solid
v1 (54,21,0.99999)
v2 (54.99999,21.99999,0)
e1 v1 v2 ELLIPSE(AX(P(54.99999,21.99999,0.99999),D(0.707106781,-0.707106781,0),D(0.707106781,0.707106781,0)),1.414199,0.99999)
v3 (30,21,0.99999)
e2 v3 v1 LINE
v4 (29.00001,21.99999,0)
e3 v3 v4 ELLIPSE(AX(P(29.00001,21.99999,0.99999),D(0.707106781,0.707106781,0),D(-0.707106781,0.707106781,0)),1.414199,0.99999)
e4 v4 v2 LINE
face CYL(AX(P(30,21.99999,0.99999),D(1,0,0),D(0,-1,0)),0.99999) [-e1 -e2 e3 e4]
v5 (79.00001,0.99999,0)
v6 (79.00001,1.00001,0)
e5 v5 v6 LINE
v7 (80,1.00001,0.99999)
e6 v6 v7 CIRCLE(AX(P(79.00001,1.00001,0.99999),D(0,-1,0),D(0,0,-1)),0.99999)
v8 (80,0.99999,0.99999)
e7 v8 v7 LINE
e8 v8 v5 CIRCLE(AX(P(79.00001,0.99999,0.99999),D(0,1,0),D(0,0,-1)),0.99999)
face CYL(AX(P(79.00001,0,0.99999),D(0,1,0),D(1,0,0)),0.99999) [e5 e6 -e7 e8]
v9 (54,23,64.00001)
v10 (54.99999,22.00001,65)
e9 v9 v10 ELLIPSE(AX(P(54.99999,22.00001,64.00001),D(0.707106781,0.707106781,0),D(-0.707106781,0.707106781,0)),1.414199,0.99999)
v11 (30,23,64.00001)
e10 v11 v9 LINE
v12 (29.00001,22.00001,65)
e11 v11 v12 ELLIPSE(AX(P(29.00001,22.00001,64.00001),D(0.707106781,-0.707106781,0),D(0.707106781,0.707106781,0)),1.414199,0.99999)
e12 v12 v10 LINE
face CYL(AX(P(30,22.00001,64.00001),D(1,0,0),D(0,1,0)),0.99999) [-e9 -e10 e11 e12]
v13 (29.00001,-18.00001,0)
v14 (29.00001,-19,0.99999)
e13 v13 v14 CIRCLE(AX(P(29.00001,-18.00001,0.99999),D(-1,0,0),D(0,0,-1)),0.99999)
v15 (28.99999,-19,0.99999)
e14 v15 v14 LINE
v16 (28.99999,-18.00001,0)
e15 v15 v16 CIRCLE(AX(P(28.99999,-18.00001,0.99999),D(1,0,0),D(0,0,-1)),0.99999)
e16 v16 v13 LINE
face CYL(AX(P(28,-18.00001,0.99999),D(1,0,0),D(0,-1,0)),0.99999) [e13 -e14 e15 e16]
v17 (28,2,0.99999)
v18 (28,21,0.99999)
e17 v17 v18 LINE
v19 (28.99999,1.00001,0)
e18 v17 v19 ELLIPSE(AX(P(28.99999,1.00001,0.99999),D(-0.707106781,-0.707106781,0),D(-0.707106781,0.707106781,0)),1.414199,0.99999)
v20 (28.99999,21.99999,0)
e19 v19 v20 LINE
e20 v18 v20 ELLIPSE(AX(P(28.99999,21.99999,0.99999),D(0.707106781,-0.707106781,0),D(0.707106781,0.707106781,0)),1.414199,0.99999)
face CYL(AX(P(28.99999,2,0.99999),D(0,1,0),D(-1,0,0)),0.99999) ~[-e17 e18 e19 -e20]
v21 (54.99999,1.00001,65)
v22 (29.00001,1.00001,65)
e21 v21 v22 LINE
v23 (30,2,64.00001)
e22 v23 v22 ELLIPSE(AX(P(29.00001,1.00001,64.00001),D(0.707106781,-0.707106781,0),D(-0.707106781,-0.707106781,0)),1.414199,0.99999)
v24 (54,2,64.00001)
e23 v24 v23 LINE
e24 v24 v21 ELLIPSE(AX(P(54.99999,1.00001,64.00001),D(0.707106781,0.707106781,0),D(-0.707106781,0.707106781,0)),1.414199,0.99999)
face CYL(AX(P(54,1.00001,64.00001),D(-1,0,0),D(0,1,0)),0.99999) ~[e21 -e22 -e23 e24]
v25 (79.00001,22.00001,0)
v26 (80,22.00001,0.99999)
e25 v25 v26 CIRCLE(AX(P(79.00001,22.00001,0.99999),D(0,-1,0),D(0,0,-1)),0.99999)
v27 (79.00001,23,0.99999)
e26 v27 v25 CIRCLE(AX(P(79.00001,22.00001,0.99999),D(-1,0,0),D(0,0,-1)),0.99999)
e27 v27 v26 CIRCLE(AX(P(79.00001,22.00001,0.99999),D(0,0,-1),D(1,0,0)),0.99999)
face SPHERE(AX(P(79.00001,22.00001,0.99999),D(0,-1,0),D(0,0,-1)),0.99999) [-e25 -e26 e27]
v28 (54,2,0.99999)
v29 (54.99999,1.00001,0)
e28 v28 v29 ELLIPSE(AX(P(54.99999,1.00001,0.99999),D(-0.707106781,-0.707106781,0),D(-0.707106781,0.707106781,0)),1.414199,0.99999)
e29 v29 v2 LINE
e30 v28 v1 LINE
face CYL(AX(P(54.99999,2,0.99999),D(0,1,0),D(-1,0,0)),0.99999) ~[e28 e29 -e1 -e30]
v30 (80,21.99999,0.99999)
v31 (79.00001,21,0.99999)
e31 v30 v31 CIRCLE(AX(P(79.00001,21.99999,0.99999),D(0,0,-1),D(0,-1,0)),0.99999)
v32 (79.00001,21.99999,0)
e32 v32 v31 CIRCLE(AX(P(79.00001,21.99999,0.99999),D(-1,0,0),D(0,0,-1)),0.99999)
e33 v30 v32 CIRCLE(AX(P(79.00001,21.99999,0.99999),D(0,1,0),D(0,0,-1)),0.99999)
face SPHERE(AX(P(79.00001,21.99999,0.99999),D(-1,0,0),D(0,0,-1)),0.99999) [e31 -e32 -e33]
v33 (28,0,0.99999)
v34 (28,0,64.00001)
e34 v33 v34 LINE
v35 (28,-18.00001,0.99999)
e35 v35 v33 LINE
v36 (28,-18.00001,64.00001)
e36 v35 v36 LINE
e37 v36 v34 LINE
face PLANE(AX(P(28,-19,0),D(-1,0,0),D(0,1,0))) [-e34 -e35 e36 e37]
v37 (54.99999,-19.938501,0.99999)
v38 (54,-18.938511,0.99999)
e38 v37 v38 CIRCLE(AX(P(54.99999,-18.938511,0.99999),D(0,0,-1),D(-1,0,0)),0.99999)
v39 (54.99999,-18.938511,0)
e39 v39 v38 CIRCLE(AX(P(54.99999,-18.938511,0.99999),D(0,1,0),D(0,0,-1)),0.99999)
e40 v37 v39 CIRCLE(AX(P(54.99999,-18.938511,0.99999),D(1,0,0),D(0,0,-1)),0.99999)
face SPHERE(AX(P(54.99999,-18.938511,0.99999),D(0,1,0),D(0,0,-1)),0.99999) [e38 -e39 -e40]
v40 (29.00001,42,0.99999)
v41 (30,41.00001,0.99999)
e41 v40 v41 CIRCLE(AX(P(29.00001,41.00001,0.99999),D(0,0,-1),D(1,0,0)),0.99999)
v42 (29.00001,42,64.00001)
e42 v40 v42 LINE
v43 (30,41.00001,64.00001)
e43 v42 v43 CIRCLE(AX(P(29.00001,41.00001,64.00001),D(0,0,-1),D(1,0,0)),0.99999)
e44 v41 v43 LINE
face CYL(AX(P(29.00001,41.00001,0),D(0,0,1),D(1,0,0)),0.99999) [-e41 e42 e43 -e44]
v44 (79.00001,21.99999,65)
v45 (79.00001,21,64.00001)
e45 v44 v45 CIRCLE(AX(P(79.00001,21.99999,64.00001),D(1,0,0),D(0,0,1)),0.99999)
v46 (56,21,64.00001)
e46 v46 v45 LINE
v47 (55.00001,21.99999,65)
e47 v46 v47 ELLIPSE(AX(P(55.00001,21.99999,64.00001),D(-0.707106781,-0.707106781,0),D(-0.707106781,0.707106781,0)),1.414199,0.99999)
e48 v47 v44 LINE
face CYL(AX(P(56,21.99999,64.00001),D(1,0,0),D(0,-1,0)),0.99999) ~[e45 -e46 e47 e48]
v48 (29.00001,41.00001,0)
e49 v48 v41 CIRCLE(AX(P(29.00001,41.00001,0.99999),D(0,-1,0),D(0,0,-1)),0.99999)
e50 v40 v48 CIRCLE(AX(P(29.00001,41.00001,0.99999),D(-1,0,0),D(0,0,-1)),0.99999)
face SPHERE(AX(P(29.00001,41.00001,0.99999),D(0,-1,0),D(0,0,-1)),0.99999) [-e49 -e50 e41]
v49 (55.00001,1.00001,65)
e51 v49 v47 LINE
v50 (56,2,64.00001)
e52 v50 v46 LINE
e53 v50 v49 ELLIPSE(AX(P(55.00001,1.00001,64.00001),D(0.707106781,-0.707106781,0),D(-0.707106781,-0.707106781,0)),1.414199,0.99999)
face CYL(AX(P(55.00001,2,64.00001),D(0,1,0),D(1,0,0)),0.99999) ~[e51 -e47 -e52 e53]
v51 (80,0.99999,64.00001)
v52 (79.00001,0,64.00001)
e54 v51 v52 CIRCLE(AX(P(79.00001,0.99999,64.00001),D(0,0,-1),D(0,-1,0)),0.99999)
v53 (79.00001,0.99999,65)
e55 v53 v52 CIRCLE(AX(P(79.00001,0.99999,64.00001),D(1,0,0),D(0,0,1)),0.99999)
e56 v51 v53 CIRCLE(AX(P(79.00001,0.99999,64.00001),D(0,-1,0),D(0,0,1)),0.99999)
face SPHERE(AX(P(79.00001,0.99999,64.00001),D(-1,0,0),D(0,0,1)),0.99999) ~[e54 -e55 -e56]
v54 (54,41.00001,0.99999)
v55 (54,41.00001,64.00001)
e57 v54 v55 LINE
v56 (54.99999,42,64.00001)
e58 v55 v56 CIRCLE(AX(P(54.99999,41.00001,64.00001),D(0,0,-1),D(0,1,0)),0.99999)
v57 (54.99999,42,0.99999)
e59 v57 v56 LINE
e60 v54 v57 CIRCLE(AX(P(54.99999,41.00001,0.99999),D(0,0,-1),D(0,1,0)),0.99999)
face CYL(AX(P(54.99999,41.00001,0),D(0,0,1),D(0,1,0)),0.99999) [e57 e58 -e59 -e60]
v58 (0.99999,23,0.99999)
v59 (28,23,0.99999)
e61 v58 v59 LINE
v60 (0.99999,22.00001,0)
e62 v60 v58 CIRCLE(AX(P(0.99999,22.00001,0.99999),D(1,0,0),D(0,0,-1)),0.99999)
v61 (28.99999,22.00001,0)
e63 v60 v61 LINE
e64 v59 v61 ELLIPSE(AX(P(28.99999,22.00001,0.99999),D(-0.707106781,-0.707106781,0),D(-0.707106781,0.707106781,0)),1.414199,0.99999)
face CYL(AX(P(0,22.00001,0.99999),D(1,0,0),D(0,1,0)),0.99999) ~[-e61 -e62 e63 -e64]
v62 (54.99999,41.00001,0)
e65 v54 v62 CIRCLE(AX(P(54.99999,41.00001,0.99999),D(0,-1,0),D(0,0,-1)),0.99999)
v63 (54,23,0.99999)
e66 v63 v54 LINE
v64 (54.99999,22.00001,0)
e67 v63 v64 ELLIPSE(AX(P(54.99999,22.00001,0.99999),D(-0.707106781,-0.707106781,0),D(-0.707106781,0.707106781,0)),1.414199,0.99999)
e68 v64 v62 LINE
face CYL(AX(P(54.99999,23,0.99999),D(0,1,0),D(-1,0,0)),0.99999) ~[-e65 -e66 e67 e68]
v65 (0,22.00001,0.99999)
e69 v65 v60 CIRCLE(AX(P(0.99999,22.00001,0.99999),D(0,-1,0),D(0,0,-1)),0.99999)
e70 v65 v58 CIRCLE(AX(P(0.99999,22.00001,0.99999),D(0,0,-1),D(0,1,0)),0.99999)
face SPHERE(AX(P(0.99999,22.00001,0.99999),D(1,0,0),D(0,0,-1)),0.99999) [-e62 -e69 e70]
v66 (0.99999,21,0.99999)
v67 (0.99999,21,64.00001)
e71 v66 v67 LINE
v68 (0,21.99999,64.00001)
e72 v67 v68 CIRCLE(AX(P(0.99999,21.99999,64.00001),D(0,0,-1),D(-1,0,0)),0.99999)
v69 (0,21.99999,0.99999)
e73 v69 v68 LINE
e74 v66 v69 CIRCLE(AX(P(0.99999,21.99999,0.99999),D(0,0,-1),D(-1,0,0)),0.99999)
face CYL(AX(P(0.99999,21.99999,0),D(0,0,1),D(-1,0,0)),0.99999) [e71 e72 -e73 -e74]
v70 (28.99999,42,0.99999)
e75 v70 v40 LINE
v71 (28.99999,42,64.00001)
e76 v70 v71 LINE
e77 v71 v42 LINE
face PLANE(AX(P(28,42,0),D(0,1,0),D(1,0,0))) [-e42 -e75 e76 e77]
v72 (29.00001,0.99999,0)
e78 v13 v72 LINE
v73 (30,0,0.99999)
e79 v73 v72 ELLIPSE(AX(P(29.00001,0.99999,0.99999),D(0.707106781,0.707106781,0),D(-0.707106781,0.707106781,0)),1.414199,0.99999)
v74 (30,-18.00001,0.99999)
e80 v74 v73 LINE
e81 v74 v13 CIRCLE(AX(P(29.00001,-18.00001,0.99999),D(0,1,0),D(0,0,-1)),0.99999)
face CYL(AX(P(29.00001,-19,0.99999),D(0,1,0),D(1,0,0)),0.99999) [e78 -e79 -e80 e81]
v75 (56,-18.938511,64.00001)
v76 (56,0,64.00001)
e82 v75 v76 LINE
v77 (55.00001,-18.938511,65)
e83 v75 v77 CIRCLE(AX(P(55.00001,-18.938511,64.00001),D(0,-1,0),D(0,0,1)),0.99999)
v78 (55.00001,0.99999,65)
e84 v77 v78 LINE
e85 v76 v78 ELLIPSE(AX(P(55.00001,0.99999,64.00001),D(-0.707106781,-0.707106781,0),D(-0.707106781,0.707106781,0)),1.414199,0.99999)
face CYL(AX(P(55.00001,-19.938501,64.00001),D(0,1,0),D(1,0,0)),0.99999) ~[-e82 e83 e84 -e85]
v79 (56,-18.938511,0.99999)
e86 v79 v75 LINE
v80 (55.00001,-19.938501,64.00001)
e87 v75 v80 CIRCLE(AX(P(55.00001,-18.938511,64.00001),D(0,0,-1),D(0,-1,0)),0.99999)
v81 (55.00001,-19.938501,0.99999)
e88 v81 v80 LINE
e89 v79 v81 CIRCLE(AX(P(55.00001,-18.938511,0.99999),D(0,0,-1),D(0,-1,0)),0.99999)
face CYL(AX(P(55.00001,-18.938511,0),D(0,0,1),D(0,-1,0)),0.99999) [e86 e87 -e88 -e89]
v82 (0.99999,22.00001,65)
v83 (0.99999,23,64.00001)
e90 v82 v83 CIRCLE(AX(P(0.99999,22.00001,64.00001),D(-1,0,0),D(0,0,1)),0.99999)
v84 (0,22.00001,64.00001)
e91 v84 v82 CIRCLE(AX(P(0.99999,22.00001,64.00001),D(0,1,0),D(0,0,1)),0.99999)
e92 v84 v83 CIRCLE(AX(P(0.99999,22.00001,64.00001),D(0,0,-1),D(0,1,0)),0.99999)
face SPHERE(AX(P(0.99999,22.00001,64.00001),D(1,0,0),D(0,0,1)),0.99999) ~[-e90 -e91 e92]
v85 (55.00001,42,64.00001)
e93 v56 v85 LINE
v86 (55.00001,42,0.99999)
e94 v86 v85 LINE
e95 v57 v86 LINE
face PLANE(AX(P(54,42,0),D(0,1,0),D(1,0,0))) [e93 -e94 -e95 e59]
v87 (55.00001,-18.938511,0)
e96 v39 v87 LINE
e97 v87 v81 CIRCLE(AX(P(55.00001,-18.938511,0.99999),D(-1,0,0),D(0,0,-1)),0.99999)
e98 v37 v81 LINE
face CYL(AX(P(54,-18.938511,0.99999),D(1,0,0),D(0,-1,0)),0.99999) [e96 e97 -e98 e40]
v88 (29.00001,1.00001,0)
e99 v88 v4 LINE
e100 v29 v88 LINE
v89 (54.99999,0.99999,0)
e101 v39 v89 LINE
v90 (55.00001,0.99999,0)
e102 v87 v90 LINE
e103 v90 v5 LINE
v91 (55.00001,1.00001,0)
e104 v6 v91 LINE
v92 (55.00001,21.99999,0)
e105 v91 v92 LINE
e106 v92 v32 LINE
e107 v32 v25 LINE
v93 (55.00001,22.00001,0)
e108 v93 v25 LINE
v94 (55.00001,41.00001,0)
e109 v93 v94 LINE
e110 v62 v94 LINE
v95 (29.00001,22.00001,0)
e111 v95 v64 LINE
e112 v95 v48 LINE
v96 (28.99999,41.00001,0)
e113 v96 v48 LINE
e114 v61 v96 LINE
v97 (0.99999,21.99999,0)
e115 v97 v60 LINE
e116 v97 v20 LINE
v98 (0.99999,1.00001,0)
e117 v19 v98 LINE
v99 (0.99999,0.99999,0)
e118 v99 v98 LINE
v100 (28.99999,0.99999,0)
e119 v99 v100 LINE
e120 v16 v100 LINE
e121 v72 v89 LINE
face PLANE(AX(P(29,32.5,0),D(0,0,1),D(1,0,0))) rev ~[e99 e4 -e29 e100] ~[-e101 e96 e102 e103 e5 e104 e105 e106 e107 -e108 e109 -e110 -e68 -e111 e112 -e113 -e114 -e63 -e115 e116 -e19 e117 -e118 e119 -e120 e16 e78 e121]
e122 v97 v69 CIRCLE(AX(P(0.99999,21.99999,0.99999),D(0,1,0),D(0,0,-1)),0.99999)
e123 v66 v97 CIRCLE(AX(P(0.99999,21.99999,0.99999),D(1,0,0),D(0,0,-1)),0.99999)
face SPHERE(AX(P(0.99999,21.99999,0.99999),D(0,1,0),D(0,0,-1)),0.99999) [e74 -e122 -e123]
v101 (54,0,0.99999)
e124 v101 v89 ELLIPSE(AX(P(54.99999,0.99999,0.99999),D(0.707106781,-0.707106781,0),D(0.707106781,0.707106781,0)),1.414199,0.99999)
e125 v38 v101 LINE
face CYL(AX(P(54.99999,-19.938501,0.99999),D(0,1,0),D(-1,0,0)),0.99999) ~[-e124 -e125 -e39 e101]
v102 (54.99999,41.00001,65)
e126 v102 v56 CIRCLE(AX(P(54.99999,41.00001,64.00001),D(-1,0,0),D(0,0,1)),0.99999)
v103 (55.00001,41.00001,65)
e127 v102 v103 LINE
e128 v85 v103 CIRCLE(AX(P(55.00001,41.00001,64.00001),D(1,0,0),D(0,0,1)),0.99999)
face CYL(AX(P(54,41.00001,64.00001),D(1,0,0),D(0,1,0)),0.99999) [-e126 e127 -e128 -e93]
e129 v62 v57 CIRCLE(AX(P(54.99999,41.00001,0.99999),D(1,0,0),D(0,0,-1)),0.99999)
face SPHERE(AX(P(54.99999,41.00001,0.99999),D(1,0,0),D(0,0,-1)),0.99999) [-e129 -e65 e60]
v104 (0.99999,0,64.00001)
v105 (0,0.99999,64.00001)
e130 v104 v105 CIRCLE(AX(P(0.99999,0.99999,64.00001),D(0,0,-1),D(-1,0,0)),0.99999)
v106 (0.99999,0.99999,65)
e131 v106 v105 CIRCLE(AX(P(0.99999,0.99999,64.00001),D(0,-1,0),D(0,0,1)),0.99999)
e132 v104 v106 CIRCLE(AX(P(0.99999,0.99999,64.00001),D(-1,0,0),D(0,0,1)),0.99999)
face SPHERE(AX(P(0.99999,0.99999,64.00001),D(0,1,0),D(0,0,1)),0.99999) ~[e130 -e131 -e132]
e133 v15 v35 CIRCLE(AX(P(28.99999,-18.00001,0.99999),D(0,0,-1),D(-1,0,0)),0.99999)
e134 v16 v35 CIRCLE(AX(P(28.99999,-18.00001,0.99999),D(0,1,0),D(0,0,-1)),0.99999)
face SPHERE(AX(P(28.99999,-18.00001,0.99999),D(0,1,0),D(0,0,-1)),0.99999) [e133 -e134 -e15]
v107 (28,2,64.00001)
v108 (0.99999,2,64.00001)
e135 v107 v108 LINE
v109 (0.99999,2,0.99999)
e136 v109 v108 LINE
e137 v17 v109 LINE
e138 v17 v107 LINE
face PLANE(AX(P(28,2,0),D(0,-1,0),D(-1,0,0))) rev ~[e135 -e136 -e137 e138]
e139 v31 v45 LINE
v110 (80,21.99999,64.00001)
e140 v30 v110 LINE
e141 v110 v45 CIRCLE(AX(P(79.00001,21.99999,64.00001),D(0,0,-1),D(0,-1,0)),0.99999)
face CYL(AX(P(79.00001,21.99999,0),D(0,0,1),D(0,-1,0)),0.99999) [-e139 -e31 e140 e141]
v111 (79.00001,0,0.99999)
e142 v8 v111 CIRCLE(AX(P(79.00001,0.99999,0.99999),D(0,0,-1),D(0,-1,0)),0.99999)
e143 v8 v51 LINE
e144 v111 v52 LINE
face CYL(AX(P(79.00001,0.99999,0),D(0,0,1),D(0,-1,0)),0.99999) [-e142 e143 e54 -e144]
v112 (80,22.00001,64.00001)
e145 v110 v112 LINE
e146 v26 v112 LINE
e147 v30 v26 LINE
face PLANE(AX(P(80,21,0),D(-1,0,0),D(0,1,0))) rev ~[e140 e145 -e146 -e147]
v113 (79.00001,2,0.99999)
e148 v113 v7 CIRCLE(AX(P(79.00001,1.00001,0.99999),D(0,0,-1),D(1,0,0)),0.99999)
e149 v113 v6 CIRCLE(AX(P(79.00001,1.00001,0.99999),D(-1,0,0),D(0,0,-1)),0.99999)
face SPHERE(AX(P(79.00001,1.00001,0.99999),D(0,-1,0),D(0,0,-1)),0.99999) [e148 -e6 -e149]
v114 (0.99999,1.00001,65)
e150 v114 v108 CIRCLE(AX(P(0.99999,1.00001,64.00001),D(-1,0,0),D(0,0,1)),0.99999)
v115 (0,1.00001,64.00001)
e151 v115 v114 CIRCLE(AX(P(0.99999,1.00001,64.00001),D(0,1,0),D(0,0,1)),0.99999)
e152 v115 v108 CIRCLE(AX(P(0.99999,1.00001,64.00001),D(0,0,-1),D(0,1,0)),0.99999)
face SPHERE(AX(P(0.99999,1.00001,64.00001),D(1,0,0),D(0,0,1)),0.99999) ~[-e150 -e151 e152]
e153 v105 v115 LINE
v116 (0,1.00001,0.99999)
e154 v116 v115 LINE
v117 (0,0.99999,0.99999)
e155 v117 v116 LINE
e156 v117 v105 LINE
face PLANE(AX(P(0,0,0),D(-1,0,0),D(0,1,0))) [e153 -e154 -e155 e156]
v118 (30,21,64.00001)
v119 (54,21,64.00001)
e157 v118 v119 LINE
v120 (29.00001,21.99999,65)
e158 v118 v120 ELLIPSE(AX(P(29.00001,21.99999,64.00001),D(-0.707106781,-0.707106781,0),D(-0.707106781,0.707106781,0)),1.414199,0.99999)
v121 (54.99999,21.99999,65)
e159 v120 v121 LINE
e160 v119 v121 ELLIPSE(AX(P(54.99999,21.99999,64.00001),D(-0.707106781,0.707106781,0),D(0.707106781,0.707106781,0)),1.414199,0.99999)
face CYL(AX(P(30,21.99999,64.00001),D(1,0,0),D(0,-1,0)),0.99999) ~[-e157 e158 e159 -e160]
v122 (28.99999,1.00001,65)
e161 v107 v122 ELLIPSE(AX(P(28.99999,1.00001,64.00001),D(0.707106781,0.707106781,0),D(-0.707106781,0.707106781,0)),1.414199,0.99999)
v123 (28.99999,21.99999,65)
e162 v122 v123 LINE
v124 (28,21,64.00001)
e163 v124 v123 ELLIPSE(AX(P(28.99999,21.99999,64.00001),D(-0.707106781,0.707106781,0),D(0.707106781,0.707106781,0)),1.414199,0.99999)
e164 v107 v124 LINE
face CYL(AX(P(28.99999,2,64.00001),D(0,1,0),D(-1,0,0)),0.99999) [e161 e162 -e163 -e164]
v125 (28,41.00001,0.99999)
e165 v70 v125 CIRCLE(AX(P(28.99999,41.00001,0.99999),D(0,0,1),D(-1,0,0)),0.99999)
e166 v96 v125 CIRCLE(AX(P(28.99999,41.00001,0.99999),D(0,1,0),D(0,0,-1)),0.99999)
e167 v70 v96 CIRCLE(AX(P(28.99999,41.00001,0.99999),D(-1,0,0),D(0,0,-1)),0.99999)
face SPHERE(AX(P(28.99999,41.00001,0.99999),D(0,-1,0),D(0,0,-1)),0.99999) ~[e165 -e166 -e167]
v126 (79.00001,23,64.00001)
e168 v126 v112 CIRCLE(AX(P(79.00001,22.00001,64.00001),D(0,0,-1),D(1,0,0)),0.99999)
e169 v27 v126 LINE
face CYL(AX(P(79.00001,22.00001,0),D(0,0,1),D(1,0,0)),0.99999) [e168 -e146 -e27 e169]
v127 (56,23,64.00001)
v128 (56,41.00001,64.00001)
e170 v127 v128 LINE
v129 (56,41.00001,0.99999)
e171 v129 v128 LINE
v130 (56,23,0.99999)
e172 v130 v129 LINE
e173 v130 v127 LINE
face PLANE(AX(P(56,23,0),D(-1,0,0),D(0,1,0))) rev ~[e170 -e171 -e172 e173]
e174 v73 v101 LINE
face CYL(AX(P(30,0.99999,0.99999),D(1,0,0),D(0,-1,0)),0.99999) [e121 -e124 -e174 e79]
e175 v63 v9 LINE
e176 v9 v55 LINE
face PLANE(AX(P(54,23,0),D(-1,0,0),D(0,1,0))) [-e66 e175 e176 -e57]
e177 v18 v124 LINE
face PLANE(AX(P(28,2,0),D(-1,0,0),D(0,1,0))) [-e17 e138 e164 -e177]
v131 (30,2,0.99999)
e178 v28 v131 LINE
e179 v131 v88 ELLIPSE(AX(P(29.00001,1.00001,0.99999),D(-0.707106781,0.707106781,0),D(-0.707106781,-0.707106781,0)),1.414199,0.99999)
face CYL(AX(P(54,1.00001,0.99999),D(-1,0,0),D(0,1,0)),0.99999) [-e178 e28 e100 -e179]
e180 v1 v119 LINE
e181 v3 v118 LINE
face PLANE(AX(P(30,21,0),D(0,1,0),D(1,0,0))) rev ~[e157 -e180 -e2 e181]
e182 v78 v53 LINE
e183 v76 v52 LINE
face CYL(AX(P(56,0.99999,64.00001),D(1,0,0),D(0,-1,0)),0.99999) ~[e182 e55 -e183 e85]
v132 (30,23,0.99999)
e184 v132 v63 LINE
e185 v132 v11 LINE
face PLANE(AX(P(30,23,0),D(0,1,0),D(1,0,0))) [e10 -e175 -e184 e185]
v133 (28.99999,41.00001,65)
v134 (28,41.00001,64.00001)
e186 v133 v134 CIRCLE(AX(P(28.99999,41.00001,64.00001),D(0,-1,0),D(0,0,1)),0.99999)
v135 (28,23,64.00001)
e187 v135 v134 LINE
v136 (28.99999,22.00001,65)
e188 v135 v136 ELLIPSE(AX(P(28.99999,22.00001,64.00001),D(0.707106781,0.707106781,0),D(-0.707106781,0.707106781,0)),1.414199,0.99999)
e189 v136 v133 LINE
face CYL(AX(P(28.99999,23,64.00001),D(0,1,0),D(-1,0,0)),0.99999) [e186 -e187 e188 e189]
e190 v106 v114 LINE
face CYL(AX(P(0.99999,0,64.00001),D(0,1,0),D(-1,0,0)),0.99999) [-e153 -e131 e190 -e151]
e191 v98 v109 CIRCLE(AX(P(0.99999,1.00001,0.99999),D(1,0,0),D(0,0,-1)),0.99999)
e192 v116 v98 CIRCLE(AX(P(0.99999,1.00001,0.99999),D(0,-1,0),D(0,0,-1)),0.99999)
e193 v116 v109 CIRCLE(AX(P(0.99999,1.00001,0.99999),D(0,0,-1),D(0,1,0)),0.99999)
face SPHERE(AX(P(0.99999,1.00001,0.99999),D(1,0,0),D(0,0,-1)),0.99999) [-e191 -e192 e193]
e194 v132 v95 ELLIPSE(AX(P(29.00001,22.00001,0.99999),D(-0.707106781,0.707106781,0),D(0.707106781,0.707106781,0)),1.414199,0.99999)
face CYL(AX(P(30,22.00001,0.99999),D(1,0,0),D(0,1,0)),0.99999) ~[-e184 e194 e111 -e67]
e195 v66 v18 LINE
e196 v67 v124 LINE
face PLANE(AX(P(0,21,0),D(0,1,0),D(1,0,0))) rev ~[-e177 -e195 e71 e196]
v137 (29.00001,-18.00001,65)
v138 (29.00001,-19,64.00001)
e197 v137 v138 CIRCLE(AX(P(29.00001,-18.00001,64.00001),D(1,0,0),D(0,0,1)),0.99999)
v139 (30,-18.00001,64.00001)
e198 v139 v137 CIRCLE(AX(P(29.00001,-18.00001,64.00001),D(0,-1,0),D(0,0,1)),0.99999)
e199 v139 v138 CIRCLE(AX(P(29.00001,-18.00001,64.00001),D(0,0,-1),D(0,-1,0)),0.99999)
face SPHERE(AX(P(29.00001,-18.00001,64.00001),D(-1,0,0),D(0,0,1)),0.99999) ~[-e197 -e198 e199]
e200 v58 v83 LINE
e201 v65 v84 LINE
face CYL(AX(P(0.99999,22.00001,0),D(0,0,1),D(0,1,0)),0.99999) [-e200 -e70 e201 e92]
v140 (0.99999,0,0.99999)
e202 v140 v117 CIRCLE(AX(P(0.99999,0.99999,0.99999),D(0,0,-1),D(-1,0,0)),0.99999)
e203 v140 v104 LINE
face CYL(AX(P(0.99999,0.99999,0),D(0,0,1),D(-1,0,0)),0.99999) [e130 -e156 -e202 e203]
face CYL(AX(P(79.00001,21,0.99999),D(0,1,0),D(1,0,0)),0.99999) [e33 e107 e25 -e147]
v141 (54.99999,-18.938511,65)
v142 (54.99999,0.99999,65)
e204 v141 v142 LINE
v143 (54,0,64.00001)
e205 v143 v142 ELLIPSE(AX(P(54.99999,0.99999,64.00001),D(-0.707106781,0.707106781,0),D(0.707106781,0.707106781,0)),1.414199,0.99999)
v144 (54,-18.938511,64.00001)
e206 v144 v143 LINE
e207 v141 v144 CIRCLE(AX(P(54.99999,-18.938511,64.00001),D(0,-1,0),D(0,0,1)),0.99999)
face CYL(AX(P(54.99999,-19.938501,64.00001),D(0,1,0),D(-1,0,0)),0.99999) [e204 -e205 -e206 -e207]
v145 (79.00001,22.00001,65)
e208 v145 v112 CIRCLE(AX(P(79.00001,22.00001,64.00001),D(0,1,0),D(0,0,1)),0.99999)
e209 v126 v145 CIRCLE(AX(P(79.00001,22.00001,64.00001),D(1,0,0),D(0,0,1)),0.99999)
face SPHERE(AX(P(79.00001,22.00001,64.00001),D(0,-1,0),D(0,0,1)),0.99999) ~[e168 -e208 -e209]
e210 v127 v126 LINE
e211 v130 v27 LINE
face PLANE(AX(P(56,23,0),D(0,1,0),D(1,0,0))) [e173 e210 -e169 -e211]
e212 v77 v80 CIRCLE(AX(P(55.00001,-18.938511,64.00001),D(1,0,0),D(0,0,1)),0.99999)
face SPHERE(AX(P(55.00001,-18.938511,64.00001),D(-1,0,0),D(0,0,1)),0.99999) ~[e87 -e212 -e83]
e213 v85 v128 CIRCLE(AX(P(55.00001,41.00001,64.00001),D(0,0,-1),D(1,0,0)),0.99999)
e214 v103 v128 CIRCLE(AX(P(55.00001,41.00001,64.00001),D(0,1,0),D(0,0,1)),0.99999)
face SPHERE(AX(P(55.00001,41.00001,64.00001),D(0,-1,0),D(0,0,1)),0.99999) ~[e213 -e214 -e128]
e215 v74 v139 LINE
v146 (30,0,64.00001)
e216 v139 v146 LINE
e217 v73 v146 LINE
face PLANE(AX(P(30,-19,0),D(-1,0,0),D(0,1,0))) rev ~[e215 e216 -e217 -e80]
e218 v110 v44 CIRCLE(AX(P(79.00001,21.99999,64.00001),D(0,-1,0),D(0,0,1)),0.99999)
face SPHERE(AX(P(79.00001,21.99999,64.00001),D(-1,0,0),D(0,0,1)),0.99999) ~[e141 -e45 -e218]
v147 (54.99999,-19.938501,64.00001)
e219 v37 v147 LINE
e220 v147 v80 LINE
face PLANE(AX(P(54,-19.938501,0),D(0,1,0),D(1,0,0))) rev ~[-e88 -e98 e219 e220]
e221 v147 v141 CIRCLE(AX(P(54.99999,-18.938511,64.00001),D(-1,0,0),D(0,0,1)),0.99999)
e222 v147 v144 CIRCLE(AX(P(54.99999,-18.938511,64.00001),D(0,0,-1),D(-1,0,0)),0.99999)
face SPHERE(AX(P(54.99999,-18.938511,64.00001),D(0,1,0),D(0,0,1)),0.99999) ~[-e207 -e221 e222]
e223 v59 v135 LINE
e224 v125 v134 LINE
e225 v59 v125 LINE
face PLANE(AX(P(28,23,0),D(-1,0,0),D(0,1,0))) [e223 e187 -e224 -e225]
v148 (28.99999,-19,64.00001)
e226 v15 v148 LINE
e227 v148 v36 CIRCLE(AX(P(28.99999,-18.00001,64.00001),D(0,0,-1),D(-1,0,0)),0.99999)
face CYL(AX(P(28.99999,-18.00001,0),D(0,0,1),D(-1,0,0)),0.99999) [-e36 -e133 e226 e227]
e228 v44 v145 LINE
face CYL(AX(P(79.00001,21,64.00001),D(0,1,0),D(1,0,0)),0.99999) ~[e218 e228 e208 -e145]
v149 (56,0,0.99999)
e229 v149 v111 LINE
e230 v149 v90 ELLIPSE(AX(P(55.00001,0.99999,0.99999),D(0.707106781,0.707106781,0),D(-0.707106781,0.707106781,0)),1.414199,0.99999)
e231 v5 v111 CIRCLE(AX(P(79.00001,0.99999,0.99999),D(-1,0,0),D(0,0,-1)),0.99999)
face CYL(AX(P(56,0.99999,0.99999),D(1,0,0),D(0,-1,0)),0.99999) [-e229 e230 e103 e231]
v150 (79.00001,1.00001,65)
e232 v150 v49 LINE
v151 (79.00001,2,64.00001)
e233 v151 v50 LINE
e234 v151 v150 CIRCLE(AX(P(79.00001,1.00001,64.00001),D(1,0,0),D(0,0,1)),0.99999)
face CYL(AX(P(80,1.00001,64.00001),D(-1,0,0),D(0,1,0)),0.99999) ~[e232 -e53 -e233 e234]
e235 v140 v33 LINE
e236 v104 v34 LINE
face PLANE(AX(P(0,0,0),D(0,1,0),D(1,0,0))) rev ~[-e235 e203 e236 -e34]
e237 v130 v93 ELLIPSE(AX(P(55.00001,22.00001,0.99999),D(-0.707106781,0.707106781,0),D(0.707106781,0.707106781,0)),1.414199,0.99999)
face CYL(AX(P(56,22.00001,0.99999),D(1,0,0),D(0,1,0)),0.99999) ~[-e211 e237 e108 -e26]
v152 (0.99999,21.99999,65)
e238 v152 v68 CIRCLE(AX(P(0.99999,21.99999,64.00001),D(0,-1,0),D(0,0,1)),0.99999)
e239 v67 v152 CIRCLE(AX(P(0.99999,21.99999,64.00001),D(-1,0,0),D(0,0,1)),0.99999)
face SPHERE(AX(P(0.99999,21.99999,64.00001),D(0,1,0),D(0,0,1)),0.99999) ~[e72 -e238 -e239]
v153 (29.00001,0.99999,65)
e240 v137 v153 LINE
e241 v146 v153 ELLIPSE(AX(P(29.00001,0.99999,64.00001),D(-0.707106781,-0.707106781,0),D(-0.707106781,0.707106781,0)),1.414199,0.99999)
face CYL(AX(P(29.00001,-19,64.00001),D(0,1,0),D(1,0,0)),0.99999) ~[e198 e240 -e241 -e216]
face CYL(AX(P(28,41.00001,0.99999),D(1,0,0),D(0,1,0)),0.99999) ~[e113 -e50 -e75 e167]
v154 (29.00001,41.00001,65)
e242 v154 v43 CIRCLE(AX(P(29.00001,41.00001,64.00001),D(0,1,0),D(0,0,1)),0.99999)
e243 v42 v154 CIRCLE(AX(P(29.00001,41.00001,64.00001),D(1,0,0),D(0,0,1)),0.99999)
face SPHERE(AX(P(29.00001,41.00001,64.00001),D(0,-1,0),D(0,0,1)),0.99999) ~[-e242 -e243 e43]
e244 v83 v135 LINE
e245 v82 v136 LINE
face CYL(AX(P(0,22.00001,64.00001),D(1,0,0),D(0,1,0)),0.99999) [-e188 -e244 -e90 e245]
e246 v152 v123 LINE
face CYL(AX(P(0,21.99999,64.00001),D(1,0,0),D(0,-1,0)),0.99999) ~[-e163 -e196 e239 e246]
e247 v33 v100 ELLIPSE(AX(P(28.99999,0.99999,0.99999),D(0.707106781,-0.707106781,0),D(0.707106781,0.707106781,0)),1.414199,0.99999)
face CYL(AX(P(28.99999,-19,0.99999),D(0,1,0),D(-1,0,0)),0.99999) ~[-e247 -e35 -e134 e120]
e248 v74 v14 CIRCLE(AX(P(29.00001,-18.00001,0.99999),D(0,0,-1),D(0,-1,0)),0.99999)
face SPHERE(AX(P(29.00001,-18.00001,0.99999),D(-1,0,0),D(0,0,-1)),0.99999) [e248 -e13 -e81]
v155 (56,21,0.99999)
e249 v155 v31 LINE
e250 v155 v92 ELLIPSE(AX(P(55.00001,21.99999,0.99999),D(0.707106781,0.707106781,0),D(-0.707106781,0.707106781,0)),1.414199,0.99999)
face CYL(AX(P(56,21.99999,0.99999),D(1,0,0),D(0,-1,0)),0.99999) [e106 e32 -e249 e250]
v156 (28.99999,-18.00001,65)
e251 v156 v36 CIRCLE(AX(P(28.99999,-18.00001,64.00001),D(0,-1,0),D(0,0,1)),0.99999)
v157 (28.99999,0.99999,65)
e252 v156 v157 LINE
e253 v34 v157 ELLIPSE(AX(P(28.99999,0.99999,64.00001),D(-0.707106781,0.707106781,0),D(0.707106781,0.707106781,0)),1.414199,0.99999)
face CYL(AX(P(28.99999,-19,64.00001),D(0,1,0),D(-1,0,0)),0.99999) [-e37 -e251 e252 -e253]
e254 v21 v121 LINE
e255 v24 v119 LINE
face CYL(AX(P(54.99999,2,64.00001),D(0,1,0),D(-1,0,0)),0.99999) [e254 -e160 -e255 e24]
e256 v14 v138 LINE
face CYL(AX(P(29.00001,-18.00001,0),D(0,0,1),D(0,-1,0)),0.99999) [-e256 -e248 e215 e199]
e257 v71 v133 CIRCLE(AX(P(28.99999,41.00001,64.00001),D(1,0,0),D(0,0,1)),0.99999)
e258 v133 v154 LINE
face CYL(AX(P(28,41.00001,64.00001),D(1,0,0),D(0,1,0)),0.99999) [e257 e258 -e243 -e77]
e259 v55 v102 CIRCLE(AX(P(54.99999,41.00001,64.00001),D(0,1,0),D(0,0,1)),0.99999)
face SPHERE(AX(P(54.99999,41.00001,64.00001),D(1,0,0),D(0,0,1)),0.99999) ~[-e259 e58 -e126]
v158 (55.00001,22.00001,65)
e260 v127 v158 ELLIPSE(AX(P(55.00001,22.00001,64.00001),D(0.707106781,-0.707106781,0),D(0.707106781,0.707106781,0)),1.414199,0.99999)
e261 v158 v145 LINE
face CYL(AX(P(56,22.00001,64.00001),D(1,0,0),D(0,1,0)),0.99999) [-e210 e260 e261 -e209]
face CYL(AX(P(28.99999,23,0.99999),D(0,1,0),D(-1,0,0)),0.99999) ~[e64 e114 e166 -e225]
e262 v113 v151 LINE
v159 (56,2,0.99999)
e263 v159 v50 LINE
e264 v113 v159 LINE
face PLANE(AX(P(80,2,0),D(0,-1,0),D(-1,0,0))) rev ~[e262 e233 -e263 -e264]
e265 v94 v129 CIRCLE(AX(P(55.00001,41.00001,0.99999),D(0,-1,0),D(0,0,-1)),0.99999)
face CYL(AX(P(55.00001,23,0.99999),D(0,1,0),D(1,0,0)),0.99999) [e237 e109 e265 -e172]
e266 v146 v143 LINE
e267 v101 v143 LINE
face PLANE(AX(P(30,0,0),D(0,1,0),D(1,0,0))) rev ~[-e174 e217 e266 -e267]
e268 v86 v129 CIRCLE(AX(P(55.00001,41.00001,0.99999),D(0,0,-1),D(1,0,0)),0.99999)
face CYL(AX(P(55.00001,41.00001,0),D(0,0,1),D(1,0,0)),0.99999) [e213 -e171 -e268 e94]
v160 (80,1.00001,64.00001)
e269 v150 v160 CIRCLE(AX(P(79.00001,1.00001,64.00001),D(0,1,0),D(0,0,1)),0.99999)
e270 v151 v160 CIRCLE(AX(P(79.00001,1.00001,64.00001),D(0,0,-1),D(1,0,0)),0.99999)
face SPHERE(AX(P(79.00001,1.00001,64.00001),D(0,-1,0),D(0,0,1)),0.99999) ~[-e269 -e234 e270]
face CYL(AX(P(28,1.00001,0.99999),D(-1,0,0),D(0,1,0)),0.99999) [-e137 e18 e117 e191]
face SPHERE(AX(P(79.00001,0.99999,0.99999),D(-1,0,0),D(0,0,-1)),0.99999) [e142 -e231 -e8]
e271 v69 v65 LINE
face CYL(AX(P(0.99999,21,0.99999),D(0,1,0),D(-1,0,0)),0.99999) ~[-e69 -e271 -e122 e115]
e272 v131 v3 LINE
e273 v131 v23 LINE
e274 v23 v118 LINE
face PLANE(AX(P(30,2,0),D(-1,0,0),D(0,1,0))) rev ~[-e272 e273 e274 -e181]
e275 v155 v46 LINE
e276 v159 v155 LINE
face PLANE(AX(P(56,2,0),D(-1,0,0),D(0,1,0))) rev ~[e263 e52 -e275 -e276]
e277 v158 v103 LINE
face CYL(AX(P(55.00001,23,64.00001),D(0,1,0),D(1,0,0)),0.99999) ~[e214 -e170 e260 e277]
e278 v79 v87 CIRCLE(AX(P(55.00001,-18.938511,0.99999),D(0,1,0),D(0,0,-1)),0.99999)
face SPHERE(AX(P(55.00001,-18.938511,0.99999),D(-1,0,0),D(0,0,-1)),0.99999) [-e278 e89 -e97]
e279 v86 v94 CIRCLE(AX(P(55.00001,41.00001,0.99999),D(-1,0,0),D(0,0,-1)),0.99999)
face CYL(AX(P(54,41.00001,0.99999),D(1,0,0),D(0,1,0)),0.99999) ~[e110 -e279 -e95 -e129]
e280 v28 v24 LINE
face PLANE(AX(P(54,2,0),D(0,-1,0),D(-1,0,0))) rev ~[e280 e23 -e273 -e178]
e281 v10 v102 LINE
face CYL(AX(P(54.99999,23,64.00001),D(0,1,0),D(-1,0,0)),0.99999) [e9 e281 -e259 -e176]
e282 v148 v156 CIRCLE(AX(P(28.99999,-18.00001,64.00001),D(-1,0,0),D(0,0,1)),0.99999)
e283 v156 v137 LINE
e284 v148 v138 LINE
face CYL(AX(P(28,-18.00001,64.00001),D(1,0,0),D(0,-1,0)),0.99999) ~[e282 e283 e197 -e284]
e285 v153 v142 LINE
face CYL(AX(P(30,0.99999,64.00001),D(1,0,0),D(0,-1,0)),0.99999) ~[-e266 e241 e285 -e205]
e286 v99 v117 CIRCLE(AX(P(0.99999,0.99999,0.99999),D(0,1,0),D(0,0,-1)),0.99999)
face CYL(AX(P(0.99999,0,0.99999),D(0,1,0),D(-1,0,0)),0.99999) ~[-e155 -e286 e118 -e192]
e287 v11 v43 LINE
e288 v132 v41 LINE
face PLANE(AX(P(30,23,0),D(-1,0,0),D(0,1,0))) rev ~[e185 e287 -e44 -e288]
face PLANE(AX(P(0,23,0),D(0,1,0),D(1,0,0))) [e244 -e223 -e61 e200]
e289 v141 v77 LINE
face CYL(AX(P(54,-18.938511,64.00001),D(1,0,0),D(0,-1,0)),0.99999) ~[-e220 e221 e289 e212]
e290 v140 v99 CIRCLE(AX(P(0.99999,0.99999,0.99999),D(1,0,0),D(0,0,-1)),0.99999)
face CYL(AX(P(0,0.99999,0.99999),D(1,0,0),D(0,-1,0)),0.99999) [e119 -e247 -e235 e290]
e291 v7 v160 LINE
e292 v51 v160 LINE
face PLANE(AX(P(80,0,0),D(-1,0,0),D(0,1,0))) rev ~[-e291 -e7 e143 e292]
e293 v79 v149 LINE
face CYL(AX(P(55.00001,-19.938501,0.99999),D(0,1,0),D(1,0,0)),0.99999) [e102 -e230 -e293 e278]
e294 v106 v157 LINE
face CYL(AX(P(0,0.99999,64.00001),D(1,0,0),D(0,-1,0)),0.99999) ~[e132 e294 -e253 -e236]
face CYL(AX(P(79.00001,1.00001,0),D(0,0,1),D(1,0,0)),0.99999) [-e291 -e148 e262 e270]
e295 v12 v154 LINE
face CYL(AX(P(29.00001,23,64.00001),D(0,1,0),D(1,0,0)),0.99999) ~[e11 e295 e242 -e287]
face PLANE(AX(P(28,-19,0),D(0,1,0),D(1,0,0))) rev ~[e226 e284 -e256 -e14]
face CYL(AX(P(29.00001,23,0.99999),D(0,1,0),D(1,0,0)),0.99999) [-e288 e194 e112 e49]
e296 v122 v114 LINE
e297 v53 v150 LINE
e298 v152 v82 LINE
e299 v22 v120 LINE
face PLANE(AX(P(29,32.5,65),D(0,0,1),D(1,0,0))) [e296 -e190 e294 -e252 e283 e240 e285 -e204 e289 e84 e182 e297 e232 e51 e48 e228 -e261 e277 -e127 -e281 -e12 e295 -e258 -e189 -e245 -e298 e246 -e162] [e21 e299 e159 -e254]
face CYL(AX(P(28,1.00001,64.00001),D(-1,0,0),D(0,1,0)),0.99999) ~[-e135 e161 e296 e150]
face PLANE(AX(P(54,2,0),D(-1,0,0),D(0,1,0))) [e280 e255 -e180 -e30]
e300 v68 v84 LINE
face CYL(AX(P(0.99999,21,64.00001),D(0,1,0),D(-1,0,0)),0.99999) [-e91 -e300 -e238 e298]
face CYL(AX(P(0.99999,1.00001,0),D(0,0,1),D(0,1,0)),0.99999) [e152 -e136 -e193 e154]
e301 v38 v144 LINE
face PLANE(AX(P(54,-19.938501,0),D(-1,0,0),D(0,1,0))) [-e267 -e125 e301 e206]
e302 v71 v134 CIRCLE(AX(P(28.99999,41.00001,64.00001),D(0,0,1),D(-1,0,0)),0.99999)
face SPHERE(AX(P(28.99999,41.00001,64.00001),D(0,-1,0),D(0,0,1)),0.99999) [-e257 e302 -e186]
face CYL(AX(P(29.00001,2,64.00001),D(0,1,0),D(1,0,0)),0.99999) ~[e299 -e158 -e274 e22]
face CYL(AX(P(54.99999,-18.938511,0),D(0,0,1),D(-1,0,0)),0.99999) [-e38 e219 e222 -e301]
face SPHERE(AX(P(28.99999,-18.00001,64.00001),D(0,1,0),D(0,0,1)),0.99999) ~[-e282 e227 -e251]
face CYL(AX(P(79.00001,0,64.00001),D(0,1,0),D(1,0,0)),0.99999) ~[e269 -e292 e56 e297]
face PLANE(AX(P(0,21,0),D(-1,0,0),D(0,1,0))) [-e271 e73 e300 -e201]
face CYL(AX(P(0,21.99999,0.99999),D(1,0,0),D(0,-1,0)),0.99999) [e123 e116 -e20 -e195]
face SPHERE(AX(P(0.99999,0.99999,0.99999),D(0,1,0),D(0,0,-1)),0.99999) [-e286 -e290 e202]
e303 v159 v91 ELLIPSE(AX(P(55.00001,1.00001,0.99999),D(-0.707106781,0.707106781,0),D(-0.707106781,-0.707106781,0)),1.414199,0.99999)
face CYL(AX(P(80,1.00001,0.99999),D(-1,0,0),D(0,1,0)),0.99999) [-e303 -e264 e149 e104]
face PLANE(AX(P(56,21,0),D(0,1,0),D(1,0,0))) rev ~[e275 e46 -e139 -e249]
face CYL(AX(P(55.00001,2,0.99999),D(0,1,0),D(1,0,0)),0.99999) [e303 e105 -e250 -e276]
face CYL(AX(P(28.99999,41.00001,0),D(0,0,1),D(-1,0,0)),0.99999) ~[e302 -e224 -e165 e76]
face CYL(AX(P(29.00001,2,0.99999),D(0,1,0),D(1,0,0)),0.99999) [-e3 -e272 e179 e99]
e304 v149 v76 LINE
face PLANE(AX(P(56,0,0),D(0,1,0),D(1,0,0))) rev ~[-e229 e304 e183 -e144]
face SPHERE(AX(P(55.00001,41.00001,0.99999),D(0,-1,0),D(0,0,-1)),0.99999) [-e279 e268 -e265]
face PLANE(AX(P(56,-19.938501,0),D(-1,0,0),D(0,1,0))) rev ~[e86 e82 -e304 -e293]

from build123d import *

# Parameters (mm, degrees)
F0_W     = 2
F0_H     = 19
F0_W_2   = 28
F0_H_2   = 2
F0_W_3   = 24
F0_H_3   = 19.9385005981
F1_DEPTH = 65
F2_R     = 0.99999


# Not quite as in the source:
# - a fillet or chamfer is up to 0.001 mm smaller than in the source, because OpenCascade refuses the exact size


with BuildPart() as f1:
    # F0 (on Top) → F1 (new body)
    with BuildSketch(Plane.XY):
        with Locations((29, 32.5)):
            Rectangle(F0_W, F0_H)
        with Locations((14, 22)):
            Rectangle(F0_W_2, F0_H_2)
        with Locations((42, 22)):
            Rectangle(F0_W_3, F0_H_2)
        with Locations((55, 32.5)):
            Rectangle(F0_W, F0_H)
        with Locations((55, 22)):
            Rectangle(F0_W, F0_H_2)
        with Locations((68, 22)):
            Rectangle(F0_W_3, F0_H_2)
        with Locations((68, 1)):
            Rectangle(F0_W_3, F0_H_2)
        with Locations((55, 1)):
            Rectangle(F0_W, F0_H_2)
        with Locations((42, 1)):
            Rectangle(F0_W_3, F0_H_2)
        with Locations((14, 1)):
            Rectangle(F0_W_2, F0_H_2)
        with Locations((29, 1)):
            Rectangle(F0_W, F0_H_2)
        with Locations((29, 11.5)):
            Rectangle(F0_W, F0_H)
        with Locations((29, -9.5)):
            Rectangle(F0_W, F0_H)
        with Locations((55, -9.969250299)):
            Rectangle(F0_W, F0_H_3)
        with Locations((29, 22)):
            Rectangle(F0_W, F0_H_2)
        with Locations((55, 11.5)):
            Rectangle(F0_W, F0_H)
    extrude(amount=F1_DEPTH)

    # F2 (radius 1 in the source; OpenCascade refuses exactly that, so slightly less here)
    f2_edges = [f1.edges().sort_by_distance(p)[0] for p in [
        (28, 32.5, 65),
        (14, 23, 65),
        (0, 22, 65),
        (14, 21, 65),
        (28, 11.5, 65),
        (14, 2, 65),
        (0, 1, 65),
        (14, 0, 65),
        (28, -9.5, 65),
        (29, -19, 65),
        (30, -9.5, 65),
        (42, 0, 65),
        (54, -9.96925, 65),
        (55, -19.938501, 65),
        (56, -9.96925, 65),
        (68, 0, 65),
        (80, 1, 65),
        (68, 2, 65),
        (56, 11.5, 65),
        (68, 21, 65),
        (80, 22, 65),
        (68, 23, 65),
        (56, 32.5, 65),
        (55, 42, 65),
        (54, 32.5, 65),
        (42, 23, 65),
        (30, 32.5, 65),
        (29, 42, 65),
        (42, 2, 65),
        (30, 11.5, 65),
        (42, 21, 65),
        (54, 11.5, 65),
        (28, 32.5, 0),
        (14, 23, 0),
        (0, 22, 0),
        (14, 21, 0),
        (28, 11.5, 0),
        (14, 2, 0),
        (0, 1, 0),
        (14, 0, 0),
        (28, -9.5, 0),
        (29, -19, 0),
        (30, -9.5, 0),
        (42, 0, 0),
        (54, -9.96925, 0),
        (55, -19.938501, 0),
        (56, -9.96925, 0),
        (68, 0, 0),
        (80, 1, 0),
        (68, 2, 0),
        (56, 11.5, 0),
        (68, 21, 0),
        (80, 22, 0),
        (68, 23, 0),
        (56, 32.5, 0),
        (55, 42, 0),
        (54, 32.5, 0),
        (42, 23, 0),
        (30, 32.5, 0),
        (29, 42, 0),
        (42, 2, 0),
        (30, 11.5, 0),
        (42, 21, 0),
        (54, 11.5, 0),
        (30, 42, 32.5),
        (28, 42, 32.5),
        (56, 42, 32.5),
        (54, 42, 32.5),
        (0, 23, 32.5),
        (0, 21, 32.5),
        (0, 2, 32.5),
        (0, 0, 32.5),
        (28, -19, 32.5),
        (30, -19, 32.5),
        (54, -19.938501, 32.5),
        (56, -19.938501, 32.5),
        (80, 0, 32.5),
        (80, 2, 32.5),
        (80, 21, 32.5),
        (80, 23, 32.5),
    ]]
    fillet(f2_edges, radius=F2_R)


solid = f1.part
